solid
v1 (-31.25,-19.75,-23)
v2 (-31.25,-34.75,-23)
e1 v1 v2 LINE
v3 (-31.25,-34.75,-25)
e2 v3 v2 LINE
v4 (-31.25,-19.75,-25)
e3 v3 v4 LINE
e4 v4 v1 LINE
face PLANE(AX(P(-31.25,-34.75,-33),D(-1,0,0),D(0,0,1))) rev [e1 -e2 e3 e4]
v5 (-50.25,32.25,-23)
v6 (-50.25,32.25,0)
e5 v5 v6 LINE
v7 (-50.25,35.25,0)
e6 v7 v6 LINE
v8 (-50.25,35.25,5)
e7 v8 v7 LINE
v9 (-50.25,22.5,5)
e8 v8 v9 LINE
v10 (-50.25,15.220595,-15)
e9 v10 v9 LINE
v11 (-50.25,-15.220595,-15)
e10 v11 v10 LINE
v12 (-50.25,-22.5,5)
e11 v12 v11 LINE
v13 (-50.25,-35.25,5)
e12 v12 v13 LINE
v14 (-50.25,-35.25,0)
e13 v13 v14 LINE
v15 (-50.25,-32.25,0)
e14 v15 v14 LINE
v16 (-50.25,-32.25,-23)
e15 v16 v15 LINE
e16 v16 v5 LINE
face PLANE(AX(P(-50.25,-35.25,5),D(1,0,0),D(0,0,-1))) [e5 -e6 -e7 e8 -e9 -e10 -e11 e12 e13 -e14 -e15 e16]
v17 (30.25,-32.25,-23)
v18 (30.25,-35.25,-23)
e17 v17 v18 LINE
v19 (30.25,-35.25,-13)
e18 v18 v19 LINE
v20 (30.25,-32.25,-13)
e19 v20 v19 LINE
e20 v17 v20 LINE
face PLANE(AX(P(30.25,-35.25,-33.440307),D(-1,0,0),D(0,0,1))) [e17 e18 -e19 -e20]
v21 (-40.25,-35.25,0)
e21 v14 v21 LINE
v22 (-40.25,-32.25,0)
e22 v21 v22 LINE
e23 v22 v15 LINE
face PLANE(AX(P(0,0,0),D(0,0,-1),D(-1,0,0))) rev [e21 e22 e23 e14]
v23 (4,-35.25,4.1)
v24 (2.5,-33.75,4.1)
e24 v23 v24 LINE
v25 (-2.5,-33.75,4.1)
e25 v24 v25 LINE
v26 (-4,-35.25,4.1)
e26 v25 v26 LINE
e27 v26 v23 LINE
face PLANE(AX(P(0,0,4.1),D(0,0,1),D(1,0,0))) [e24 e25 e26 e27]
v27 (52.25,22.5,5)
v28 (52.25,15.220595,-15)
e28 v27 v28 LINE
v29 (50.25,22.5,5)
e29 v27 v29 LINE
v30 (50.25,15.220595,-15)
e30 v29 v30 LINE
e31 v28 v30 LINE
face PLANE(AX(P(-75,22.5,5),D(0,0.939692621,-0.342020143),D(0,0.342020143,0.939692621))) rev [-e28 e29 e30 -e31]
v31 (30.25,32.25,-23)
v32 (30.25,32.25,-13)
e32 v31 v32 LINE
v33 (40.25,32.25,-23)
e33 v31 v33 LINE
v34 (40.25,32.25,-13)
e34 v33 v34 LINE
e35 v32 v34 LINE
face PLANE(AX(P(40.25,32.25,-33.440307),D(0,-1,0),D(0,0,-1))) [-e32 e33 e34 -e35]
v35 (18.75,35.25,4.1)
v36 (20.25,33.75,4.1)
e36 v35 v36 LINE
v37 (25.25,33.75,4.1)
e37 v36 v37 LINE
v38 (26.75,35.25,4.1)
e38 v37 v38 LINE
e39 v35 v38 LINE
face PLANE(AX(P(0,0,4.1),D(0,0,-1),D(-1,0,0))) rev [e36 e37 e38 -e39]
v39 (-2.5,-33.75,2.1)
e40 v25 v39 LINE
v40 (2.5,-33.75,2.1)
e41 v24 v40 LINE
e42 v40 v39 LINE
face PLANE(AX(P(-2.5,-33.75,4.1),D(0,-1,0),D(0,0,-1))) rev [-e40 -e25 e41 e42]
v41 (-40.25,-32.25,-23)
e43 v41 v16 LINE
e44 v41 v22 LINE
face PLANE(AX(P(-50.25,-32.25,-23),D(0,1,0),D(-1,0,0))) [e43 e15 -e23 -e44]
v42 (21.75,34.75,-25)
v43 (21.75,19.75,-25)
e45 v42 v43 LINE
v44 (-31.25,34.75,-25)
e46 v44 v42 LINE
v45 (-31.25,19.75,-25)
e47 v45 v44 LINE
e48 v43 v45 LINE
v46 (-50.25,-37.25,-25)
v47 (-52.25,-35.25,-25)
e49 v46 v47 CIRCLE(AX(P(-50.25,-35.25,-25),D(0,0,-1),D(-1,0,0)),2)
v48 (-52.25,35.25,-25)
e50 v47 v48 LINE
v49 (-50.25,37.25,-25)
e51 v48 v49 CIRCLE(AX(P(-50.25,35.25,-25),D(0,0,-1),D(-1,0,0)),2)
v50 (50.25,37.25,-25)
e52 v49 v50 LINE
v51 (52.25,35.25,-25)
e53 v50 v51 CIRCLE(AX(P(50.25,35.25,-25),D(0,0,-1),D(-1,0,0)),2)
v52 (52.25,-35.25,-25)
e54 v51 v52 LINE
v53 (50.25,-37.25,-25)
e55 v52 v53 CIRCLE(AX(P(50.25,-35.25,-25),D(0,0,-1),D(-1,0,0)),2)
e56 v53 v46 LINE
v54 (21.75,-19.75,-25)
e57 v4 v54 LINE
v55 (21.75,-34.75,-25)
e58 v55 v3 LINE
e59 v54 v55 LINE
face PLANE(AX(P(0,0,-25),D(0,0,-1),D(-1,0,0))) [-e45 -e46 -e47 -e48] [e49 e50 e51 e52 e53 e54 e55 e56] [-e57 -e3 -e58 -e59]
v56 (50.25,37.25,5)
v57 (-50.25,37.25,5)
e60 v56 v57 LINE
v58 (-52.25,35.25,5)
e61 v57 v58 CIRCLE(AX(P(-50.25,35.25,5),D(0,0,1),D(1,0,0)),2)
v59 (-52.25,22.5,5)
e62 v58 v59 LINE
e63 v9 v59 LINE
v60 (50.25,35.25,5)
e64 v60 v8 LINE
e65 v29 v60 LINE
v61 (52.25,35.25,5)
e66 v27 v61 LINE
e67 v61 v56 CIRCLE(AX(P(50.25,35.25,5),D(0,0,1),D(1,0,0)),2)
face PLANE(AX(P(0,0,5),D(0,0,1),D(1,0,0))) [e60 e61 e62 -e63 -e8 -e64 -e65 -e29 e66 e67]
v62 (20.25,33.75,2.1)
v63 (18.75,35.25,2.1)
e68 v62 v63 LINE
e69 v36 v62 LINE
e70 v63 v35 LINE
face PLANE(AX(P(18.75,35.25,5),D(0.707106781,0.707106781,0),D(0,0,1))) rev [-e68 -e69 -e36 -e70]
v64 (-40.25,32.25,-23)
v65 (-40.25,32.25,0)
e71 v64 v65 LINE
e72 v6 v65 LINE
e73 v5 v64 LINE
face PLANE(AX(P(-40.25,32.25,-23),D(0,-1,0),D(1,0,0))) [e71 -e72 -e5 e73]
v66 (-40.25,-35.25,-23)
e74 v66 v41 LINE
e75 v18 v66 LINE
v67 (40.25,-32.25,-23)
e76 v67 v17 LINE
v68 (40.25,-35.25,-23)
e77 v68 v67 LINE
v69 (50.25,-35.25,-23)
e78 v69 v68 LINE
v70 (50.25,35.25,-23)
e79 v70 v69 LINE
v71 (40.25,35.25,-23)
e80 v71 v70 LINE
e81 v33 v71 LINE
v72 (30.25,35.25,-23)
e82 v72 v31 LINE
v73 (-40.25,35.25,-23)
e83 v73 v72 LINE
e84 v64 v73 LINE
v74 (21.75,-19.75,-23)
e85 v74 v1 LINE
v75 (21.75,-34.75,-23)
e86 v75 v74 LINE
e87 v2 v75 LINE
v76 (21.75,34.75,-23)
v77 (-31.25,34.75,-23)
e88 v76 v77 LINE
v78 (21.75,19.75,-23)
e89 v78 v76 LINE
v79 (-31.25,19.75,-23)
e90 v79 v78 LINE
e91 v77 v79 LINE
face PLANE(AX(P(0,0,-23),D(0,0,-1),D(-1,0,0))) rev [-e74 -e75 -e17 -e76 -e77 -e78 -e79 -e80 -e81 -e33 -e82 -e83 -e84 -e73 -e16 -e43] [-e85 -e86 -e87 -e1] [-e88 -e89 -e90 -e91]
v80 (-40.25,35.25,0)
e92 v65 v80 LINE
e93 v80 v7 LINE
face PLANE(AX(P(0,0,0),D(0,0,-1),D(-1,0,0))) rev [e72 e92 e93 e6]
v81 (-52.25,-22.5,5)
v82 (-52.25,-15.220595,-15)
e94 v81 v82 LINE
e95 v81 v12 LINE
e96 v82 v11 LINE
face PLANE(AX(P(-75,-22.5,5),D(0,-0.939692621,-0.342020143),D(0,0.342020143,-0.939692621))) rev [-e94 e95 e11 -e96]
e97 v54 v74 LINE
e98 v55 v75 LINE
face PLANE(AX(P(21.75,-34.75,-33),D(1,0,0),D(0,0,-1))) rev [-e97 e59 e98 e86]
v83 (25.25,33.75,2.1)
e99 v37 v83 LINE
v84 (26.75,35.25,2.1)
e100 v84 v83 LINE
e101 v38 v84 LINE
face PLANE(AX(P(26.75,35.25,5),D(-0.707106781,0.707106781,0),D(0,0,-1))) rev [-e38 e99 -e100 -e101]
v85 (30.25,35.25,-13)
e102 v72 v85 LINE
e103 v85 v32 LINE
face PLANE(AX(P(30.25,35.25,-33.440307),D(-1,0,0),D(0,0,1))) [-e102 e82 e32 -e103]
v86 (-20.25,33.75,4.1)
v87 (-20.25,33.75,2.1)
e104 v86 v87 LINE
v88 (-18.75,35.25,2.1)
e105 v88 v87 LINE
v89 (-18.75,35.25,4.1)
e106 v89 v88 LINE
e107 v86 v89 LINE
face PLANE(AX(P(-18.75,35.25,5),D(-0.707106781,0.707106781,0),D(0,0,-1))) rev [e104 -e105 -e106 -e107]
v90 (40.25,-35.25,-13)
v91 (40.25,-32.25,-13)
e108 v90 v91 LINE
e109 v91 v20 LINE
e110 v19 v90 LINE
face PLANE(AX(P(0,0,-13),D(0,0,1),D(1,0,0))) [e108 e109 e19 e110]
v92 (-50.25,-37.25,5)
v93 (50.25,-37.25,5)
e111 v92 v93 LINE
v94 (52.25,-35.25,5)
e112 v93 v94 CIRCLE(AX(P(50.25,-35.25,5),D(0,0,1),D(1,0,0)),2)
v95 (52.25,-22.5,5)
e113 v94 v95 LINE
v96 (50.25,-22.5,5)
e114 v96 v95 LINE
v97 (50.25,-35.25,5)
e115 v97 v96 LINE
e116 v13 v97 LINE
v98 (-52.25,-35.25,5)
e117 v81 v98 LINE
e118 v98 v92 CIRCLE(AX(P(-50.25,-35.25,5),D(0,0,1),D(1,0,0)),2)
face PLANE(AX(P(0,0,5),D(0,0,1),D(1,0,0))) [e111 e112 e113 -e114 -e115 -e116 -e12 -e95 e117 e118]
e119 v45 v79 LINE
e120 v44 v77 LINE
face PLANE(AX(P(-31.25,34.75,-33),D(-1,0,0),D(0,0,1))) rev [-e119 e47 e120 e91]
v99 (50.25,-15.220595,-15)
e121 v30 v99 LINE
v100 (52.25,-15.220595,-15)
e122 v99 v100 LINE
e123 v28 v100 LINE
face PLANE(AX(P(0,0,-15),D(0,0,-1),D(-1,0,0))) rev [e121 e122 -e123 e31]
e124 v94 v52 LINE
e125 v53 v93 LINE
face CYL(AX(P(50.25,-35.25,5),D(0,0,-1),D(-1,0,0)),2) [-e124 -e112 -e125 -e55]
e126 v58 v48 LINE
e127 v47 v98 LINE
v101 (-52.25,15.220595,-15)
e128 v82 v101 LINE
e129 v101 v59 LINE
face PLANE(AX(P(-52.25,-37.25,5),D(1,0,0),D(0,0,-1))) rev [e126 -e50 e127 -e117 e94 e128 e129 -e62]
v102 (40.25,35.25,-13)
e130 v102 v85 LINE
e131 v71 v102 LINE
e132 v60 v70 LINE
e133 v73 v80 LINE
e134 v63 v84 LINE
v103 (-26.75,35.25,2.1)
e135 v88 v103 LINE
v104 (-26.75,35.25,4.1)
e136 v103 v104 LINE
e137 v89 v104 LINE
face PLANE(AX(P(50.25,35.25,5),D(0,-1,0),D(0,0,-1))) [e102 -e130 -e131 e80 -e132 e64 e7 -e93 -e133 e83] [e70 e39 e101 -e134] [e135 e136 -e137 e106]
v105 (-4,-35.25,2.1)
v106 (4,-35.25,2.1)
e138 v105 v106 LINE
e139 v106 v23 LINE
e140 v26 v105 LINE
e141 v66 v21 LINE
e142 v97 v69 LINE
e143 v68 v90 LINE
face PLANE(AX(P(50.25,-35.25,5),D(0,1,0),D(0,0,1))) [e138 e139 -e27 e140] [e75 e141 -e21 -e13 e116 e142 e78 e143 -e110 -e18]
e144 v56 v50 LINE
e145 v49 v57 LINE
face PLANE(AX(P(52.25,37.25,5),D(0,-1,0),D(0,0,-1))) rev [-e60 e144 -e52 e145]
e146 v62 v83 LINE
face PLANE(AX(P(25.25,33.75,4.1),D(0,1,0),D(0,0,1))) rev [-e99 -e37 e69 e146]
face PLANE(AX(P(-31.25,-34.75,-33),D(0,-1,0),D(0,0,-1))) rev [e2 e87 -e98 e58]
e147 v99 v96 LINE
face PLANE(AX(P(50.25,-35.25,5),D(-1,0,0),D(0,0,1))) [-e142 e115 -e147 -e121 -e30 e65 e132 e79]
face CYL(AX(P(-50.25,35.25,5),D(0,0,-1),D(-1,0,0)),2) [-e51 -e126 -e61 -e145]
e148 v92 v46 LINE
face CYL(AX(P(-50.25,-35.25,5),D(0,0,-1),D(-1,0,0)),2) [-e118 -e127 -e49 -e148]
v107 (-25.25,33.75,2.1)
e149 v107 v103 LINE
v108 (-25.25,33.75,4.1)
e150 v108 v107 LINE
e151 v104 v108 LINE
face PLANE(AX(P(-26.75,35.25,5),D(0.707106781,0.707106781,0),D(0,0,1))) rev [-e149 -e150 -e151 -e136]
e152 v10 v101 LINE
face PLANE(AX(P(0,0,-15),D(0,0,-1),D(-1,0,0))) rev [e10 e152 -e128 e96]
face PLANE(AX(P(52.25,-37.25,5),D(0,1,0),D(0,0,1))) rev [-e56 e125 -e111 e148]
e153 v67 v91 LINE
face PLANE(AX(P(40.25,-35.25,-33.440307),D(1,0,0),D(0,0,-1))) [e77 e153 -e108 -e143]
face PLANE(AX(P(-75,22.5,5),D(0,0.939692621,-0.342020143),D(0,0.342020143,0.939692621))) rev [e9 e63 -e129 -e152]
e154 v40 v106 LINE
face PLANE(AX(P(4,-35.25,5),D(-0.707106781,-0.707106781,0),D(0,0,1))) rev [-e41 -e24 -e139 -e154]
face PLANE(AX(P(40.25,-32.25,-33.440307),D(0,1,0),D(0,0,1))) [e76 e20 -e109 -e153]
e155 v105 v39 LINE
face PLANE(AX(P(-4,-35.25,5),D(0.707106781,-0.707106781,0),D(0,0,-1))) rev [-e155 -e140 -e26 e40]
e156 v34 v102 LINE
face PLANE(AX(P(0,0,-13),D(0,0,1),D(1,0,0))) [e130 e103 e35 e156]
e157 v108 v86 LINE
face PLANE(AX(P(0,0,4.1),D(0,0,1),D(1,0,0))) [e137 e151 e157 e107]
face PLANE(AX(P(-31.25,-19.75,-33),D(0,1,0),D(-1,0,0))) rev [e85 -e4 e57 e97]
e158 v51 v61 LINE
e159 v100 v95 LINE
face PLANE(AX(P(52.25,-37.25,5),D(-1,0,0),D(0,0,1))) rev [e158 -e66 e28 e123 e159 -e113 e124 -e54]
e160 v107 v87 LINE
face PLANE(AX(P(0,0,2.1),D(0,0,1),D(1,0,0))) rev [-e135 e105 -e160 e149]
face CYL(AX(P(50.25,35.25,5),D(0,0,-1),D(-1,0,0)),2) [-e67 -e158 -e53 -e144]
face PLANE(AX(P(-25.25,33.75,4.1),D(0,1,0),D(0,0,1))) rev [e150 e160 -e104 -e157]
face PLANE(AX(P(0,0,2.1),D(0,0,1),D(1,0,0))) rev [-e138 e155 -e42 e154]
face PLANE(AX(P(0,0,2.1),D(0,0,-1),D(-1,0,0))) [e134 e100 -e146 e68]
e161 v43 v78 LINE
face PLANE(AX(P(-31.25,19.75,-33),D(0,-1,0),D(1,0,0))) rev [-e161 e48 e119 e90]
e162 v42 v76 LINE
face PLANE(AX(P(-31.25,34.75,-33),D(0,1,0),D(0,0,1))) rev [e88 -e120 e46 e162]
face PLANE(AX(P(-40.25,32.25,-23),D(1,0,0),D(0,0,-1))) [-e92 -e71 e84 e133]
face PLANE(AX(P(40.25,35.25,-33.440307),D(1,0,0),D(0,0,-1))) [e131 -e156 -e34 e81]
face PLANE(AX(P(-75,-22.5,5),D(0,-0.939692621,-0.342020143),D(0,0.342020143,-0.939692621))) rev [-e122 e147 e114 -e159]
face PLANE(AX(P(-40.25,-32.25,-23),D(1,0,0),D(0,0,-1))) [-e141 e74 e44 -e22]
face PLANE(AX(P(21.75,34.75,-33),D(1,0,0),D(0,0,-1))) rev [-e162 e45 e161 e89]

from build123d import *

# Parameters (mm, degrees)
SKETCH1_W                               = 74.5
SKETCH1_H                               = 104.5
SKETCH1_W_2                             = 70.5
SKETCH1_H_2                             = 100.5
BOSS_EXTRUDE1_ABOVE_BOARD_SURFACE_DEPTH = 5
SKETCH2_W                               = 104.5
SKETCH2_H                               = 74.5
BOSS_EXTRUDE2_UNDER_23MM_DEPTH          = 23
SKETCH3_W                               = 104.5
SKETCH3_H                               = 74.5
BOSS_EXTRUDE3_BOTTOM_COVER_2MM_DEPTH    = 2
SKETCH4_W                               = 5
SKETCH4_H                               = 3.5
BOSS_EXTRUDE4_ANCHOR_PINS_DEPTH         = 2
SKETCH5_W                               = 150
SKETCH5_H                               = 45
CUT_EXTRUDE1_CUT_USB_DEPTH              = 20
CUT_EXTRUDE1_CUT_USB_DRAFT              = -20
FILLET1_R                               = 2
CHAMFER2_SIZE                           = 1.5
SKETCH6_W                               = 10
SKETCH6_H                               = 3
BOSS_EXTRUDE1_DEPTH                     = 10
SKETCH7_W                               = 53
SKETCH7_H                               = 15
CUT_EXTRUDE1_DEPTH                      = 10


with BuildPart() as part:
    # Sketch1 → Boss-Extrude1-above-board-surface (new body)
    with BuildSketch(Plane(origin=(0, 0, 0), x_dir=(0, 1, 0), z_dir=(0, 0, 1))):
        Rectangle(SKETCH1_W, SKETCH1_H)
        Rectangle(SKETCH1_W_2, SKETCH1_H_2, mode=Mode.SUBTRACT)
    extrude(amount=BOSS_EXTRUDE1_ABOVE_BOARD_SURFACE_DEPTH)

    # Sketch2 → Boss-Extrude2-under-23mm (add)
    with BuildSketch(Plane(origin=(0, 0, 0), x_dir=(1, 0, 0), z_dir=(0, 0, -1))):
        Rectangle(SKETCH2_W, SKETCH2_H)
        Polygon((-50.25, 32.25), (-40.25, 32.25), (-40.25, 35.25), (50.25, 35.25), (50.25, -35.25), (-40.25, -35.25), (-40.25, -32.25), (-50.25, -32.25), align=None, mode=Mode.SUBTRACT)
    extrude(amount=BOSS_EXTRUDE2_UNDER_23MM_DEPTH)

    # Sketch3 → Boss-Extrude3-bottom-cover-2mm (add)
    with BuildSketch(Plane(origin=(0, 0, -23), x_dir=(1, 0, 0), z_dir=(0, 0, -1))):
        Rectangle(SKETCH3_W, SKETCH3_H)
    extrude(amount=BOSS_EXTRUDE3_BOTTOM_COVER_2MM_DEPTH)

    # Sketch4 → Boss-Extrude4-anchor-pins (add)
    with BuildSketch(Plane.XY.offset(2.1)):
        with Locations((-22.75, 35.5)):
            Rectangle(SKETCH4_W, SKETCH4_H)
        with Locations((22.75, 35.5)):
            Rectangle(SKETCH4_W, SKETCH4_H)
        with Locations((0, -35.5)):
            Rectangle(SKETCH4_W, SKETCH4_H)
    extrude(amount=BOSS_EXTRUDE4_ANCHOR_PINS_DEPTH)


with BuildPart() as cut_extrude1_cut_usb_tool:
    # Sketch5 → Cut-Extrude1-cut-usb (with draft: the straight prism first)
    with BuildSketch(Plane.XY.offset(5)):
        Rectangle(SKETCH5_W, SKETCH5_H)
    extrude(amount=-CUT_EXTRUDE1_CUT_USB_DEPTH)
    # Cut-Extrude1-cut-usb: the draft: its side faces are tilted about the plane it starts from
    cut_extrude1_cut_usb_sides = [cut_extrude1_cut_usb_tool.faces().sort_by_distance(p)[0] for p in [
        (0, -22.5, -5),
        (75, 0, -5),
        (0, 22.5, -5),
        (-75, 0, -5),
    ]]
    draft(cut_extrude1_cut_usb_sides, Plane.XY.offset(5), CUT_EXTRUDE1_CUT_USB_DRAFT)


with BuildPart() as part_1:
    add(part.part)

    # Cut-Extrude1-cut-usb: cut by cut_extrude1_cut_usb_tool
    add(cut_extrude1_cut_usb_tool.part, mode=Mode.SUBTRACT)

    # Fillet1
    fillet1_edges = [part_1.edges().sort_by_distance(p)[0] for p in [
        (52.25, -37.25, -10),
        (-52.25, -37.25, -10),
        (-52.25, 37.25, -10),
        (52.25, 37.25, -10),
    ]]
    fillet(fillet1_edges, radius=FILLET1_R)

    # Chamfer2
    chamfer2_edges = [part_1.edges().sort_by_distance(p)[0] for p in [
        (20.25, 35.25, 3.1),
        (25.25, 35.25, 3.1),
        (-25.25, 35.25, 3.1),
        (-20.25, 35.25, 3.1),
        (2.5, -35.25, 3.1),
        (-2.5, -35.25, 3.1),
    ]]
    chamfer(chamfer2_edges, length=CHAMFER2_SIZE - 0.0001)  # a hair under: the kernel refuses the full size

    # Sketch6 → Boss-Extrude1 (add)
    with BuildSketch(Plane.XY.offset(-13)):
        with Locations((35.25, -33.75)):
            Rectangle(SKETCH6_W, SKETCH6_H)
        with Locations((35.25, 33.75)):
            Rectangle(SKETCH6_W, SKETCH6_H)
    extrude(amount=-BOSS_EXTRUDE1_DEPTH)

    # Sketch7 → Cut-Extrude1 (cut)
    with BuildSketch(Plane.XY.offset(-23)):
        with Locations((-4.75, 27.25)):
            Rectangle(SKETCH7_W, SKETCH7_H)
        with Locations((-4.75, -27.25)):
            Rectangle(SKETCH7_W, SKETCH7_H)
    extrude(amount=-CUT_EXTRUDE1_DEPTH, mode=Mode.SUBTRACT)


solid = part_1.part
